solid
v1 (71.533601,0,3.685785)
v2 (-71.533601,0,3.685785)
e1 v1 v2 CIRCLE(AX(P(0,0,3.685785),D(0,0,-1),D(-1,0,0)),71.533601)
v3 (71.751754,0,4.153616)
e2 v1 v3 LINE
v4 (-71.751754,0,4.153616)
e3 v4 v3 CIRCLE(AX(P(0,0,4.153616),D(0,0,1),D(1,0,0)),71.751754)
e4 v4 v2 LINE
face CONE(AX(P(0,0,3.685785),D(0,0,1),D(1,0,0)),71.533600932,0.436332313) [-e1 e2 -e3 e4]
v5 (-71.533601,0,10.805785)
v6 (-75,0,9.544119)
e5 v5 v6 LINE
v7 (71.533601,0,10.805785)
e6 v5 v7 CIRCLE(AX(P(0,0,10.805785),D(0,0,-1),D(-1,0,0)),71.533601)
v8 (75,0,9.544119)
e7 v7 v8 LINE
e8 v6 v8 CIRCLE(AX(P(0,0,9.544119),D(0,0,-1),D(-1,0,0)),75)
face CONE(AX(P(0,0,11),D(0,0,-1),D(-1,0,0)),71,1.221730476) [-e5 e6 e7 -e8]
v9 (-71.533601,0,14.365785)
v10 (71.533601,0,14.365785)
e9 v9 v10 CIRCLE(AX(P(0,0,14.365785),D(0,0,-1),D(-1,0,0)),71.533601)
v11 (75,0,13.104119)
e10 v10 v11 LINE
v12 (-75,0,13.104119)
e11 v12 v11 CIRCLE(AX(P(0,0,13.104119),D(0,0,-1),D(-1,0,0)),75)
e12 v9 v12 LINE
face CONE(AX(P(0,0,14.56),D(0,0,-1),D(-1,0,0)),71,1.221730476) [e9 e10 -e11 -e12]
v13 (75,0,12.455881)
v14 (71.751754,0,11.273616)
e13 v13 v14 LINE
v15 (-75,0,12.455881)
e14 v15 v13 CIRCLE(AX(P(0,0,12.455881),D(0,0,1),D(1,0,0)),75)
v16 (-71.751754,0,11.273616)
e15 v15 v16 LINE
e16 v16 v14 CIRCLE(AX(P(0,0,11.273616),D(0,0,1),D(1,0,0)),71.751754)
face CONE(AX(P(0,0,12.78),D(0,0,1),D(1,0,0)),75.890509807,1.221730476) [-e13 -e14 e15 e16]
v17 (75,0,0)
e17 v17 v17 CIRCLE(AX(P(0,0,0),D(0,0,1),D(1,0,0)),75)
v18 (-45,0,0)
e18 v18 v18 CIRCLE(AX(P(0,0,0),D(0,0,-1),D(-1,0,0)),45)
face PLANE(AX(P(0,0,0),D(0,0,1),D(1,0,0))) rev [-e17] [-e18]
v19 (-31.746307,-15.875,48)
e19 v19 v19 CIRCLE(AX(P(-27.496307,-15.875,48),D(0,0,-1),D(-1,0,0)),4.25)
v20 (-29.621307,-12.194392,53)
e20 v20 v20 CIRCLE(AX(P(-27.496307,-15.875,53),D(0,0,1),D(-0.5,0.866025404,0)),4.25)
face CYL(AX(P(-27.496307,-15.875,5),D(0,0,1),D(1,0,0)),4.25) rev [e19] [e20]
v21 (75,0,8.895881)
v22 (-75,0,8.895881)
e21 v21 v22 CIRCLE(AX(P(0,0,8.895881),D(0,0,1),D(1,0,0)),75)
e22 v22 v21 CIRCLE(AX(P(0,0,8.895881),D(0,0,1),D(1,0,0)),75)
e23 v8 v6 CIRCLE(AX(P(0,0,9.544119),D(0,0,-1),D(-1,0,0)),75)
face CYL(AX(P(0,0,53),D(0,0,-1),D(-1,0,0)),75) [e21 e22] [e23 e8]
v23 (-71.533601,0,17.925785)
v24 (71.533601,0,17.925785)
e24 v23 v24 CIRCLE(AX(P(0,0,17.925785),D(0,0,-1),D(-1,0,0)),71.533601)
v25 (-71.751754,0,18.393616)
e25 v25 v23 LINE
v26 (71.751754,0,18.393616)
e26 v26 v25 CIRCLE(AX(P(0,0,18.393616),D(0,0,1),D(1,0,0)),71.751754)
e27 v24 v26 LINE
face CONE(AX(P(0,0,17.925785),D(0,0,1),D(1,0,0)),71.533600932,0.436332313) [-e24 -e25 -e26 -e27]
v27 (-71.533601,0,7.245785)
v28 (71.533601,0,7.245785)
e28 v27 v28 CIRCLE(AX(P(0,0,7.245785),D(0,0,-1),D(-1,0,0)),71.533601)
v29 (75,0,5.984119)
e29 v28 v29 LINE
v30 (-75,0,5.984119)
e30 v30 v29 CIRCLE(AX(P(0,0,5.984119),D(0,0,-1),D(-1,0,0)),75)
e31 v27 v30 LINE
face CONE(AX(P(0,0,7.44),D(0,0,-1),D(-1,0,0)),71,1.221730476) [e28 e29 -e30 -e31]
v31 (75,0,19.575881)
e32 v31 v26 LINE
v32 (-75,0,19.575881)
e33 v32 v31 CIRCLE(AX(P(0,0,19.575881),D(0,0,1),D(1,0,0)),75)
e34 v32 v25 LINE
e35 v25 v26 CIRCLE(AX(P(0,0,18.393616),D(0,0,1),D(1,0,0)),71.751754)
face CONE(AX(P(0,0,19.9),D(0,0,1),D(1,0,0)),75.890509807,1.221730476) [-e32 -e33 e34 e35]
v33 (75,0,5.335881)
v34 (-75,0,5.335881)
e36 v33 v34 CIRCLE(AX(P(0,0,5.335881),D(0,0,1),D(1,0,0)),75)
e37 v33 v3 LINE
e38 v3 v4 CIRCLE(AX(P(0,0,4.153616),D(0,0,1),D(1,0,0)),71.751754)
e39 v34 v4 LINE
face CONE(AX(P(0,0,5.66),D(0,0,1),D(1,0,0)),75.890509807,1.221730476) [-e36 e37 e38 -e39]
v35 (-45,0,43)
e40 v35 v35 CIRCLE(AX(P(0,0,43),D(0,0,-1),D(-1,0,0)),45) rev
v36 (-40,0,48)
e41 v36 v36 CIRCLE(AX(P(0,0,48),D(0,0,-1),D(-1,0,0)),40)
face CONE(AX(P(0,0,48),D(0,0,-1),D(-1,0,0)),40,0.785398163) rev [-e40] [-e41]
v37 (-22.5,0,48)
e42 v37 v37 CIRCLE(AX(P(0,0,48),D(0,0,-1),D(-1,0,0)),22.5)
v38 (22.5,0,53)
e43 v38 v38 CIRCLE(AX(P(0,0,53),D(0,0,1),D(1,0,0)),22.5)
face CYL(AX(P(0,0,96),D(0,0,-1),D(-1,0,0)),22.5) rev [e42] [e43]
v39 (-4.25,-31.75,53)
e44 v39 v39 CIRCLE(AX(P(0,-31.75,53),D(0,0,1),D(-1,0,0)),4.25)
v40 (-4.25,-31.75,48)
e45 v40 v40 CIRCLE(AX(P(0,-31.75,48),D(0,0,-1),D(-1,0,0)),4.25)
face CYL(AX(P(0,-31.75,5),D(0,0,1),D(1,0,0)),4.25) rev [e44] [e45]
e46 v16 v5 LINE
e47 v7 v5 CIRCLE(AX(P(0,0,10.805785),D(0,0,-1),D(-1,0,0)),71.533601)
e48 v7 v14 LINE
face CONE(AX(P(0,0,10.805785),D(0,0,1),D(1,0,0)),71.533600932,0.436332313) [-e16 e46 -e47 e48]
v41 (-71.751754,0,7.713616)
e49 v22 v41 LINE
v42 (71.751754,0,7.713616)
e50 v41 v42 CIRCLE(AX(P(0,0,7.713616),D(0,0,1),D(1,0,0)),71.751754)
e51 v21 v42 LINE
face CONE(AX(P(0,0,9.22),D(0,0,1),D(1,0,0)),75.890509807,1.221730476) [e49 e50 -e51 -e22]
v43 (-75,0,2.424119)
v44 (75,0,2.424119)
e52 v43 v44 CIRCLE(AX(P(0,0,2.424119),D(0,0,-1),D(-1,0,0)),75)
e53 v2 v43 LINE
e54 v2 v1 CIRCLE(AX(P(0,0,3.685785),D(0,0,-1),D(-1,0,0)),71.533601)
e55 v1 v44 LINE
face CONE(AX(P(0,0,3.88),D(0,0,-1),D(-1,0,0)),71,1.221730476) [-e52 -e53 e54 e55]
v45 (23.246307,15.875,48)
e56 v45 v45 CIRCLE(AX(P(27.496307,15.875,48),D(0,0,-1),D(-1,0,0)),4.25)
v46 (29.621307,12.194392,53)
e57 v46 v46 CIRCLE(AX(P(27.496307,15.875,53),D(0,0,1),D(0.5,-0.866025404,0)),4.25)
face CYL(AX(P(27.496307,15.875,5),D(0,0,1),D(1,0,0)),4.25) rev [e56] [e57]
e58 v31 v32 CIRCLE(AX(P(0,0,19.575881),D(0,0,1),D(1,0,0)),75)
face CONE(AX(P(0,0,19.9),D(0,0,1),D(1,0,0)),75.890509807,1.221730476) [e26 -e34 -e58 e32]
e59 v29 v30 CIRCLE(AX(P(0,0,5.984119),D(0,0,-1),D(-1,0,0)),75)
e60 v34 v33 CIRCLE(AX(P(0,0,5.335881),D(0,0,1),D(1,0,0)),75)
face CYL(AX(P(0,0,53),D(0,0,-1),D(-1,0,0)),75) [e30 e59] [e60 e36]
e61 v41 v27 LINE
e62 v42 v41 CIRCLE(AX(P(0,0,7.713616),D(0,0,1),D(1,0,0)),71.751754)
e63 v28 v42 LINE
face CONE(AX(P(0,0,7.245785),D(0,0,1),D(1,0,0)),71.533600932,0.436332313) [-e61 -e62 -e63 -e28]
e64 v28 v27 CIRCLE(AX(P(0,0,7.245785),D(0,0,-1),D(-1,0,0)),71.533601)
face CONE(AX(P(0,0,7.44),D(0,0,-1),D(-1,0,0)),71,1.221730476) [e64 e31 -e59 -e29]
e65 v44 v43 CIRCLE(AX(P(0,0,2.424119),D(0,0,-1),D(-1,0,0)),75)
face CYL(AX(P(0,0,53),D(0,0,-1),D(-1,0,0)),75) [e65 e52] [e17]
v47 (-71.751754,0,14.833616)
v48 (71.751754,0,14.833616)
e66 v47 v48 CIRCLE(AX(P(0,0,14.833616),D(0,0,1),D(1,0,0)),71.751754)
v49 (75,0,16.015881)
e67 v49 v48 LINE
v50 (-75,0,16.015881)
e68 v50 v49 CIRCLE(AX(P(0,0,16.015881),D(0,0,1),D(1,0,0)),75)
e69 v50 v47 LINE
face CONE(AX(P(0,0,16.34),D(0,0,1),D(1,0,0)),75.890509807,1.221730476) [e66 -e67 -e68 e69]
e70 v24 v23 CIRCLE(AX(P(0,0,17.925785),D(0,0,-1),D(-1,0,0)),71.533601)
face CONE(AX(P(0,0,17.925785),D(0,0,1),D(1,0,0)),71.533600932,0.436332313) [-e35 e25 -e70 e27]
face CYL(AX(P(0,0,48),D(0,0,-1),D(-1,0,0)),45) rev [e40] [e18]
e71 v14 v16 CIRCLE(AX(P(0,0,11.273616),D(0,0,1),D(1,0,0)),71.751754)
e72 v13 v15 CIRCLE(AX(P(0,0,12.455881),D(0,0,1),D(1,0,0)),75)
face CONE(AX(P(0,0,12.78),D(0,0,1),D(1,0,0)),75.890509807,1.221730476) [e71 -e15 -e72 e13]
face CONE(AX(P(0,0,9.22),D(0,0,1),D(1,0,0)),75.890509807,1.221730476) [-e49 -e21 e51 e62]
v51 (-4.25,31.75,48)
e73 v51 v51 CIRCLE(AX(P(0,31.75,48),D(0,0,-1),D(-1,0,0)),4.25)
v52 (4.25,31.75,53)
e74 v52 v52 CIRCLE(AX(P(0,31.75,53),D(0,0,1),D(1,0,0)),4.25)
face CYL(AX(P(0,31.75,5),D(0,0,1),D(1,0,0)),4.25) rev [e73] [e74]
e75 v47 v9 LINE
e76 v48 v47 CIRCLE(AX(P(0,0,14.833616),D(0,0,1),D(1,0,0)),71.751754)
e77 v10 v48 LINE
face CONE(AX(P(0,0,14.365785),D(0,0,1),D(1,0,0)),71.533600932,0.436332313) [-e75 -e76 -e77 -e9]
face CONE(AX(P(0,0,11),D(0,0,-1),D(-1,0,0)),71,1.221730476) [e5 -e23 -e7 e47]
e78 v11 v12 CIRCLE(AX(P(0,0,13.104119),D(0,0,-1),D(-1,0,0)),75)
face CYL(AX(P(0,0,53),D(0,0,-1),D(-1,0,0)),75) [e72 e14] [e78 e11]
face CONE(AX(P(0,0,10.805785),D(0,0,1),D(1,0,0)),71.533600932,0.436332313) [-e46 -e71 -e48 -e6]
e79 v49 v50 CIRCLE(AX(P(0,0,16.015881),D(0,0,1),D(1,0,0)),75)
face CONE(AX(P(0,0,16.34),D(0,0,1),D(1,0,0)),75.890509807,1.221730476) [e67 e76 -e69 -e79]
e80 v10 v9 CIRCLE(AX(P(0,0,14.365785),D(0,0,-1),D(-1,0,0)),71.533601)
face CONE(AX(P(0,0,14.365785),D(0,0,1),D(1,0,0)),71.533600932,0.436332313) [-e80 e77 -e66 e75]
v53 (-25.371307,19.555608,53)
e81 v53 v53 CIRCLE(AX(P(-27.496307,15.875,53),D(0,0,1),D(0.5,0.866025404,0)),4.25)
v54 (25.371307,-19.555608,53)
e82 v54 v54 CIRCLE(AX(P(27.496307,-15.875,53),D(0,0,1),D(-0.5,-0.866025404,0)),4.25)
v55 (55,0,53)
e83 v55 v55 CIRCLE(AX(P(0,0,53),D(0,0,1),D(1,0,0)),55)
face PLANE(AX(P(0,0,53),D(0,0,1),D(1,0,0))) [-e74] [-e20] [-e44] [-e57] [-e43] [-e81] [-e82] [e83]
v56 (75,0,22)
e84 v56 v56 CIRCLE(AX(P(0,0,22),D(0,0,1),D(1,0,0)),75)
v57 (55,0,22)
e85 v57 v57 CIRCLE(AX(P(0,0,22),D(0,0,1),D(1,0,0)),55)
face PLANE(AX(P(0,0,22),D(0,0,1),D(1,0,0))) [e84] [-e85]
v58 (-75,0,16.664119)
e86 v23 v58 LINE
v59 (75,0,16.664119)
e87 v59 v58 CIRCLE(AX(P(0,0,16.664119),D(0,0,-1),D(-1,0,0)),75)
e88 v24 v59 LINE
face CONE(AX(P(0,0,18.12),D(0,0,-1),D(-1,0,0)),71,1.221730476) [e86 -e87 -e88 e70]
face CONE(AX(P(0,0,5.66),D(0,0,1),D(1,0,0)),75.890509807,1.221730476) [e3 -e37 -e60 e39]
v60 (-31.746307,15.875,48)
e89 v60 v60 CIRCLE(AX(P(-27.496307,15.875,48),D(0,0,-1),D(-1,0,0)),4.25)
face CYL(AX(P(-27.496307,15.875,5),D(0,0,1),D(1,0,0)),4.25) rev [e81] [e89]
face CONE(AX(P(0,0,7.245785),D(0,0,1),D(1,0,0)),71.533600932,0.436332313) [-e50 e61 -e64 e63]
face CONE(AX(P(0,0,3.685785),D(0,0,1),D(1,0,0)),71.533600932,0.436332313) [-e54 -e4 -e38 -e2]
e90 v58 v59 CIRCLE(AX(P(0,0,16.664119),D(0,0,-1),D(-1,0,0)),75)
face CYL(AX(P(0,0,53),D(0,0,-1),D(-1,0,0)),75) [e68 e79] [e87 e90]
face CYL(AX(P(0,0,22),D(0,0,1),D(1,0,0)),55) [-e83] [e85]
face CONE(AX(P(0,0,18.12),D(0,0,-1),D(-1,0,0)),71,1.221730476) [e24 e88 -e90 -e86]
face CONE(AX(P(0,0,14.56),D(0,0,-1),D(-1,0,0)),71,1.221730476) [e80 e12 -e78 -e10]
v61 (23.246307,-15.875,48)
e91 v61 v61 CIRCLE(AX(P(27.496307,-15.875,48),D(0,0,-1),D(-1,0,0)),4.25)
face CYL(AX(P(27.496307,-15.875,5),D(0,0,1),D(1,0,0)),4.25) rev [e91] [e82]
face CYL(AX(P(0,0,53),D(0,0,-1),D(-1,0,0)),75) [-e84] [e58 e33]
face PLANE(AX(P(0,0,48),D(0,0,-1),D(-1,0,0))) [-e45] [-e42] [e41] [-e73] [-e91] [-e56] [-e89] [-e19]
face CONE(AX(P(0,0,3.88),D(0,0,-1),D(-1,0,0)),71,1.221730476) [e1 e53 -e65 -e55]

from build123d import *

# Parameters (mm, degrees)
ESQUISSE1_R                  = 75
BOSS_EXTRU_1_DEPTH           = 53
ENL_V_START                  = -31
ESQUISSE2_R                  = 75
ESQUISSE2_R_2                = 55
ENL_V_MAT_EXTRU_1_DEPTH      = 31
ESQUISSE3_R                  = 45
ENL_V_MAT_EXTRU_2_DEPTH      = 48
ESQUISSE4_R                  = 22.5
ENL_V_MAT_EXTRU_3_DEPTH      = 48
ESQUISSE5_R                  = 4.25
ENL_V_MAT_EXTRU_4_DEPTH      = 48
R_P_TITION_CIRCULAIRE1_COUNT = 6
R_P_TITION_LIN_AIRE1_COUNT   = 3
R_P_TITION_LIN_AIRE1_PITCH   = 3.56
R_P_TITION_LIN_AIRE2_COUNT   = 3
R_P_TITION_LIN_AIRE2_PITCH   = 3.56
CHANFREIN1_SIZE              = 0.567846251
CHANFREIN1_SIZE_2            = 0.8
CHANFREIN2_SIZE              = 5


with BuildPart() as part:
    # Esquisse1 → Boss.-Extru.1 (new body)
    with BuildSketch(Plane.XY):
        Circle(ESQUISSE1_R)
    extrude(amount=BOSS_EXTRU_1_DEPTH)

    # Esquisse2 → Enlèv. mat.-Extru.1 (cut)
    with BuildSketch(Plane.XY.offset(53).offset(ENL_V_START)):
        Circle(ESQUISSE2_R)
        Circle(ESQUISSE2_R_2, mode=Mode.SUBTRACT)
    extrude(amount=ENL_V_MAT_EXTRU_1_DEPTH, mode=Mode.SUBTRACT)

    # Esquisse3 → Enlèv. mat.-Extru.2 (cut)
    with BuildSketch(Plane(origin=(0, 0, 0), x_dir=(-1, 0, 0), z_dir=(0, 0, -1))):
        Circle(ESQUISSE3_R)
    extrude(amount=-ENL_V_MAT_EXTRU_2_DEPTH, mode=Mode.SUBTRACT)

    # Esquisse4 → Enlèv. mat.-Extru.3 (cut)
    with BuildSketch(Plane(origin=(0, 0, 48), x_dir=(-1, 0, 0), z_dir=(0, 0, -1))):
        Circle(ESQUISSE4_R)
    extrude(amount=-ENL_V_MAT_EXTRU_3_DEPTH, mode=Mode.SUBTRACT)

    # Esquisse5 → Enlèv. mat.-Extru.4 (cut)
    with BuildSketch(Plane.XY.offset(53)):
        with Locations((0, 31.75)):
            Circle(ESQUISSE5_R)
    enl_v_mat_extru_4 = extrude(amount=-ENL_V_MAT_EXTRU_4_DEPTH, mode=Mode.SUBTRACT)

    # Répétition circulaire1: Enlèv. mat.-Extru.4 ×6 about axis
    r_p_tition_circulaire1_axis = Axis((0, 0, 0), (0, 0, 1))
    for i in range(1, R_P_TITION_CIRCULAIRE1_COUNT):
        add(enl_v_mat_extru_4.rotate(r_p_tition_circulaire1_axis, i * 360 / R_P_TITION_CIRCULAIRE1_COUNT), mode=Mode.SUBTRACT)

    # Enlèvement de matière-Balayage1: sweep along a curve in space
    with BuildLine() as enl_vement_de_mati_re_balayage1_path:
        ThreePointArc((75, 0, 0), (53.033008589, 53.033008589, 0), (0, 75, 0))
        ThreePointArc((0, 75, 0), (-53.033008589, 53.033008589, 0), (-75, 0, 0))
        ThreePointArc((-75, 0, 0), (-53.033008589, -53.033008589, 0), (0, -75, 0))
        ThreePointArc((0, -75, 0), (53.033008589, -53.033008589, 0), (75, 0, 0))
    # Esquisse6 → Enlèvement de matière-Balayage1 (sweep, cut)
    with BuildSketch(Plane(origin=(0, 0, 0), x_dir=(1, 0, 0), z_dir=(0, 1, 0))):
        Polygon((-75.890509807, -12.78), (-71, -11), (-75.890509807, -9.22), align=None)
    enl_vement_de_mati_re_balayage1 = sweep(path=enl_vement_de_mati_re_balayage1_path.line, mode=Mode.SUBTRACT)

    # Répétition linéaire1: Enlèvement de matière-Balayage1 ×3
    with Locations(*[(0, 0, -i * R_P_TITION_LIN_AIRE1_PITCH) for i in range(1, R_P_TITION_LIN_AIRE1_COUNT)]):
        add(enl_vement_de_mati_re_balayage1, mode=Mode.SUBTRACT)

    # Répétition linéaire2: Enlèvement de matière-Balayage1 ×3
    with Locations(*[(0, 0, i * R_P_TITION_LIN_AIRE2_PITCH) for i in range(1, R_P_TITION_LIN_AIRE2_COUNT)]):
        add(enl_vement_de_mati_re_balayage1, mode=Mode.SUBTRACT)

    # Chanfrein1
    # the kernel refuses this chamfer: 0.8, 0.567846251 mm, written as the material it adds along each edge
    with BuildSketch(Plane(origin=(0, 0, 14.56), x_dir=(0, -1, 0), z_dir=(-1, 0, 0))) as chanfrein1_piece_1:
        Polygon((71 + CHANFREIN1_SIZE * 0.939692621403, -CHANFREIN1_SIZE * 0.34202014355), (71 + CHANFREIN1_SIZE_2 * 0.939692620786, CHANFREIN1_SIZE_2 * 0.342020143326), (71, 0), align=None)
    revolve(axis=Axis((0, 0, 14.56), (0, 0, 1)), revolution_arc=90)
    with BuildSketch(Plane(origin=(0, 0, 14.56), x_dir=(0, 1, 0), z_dir=(1, 0, 0))) as chanfrein1_piece_2:
        Polygon((71 + CHANFREIN1_SIZE * 0.939692621403, -CHANFREIN1_SIZE * 0.34202014355), (71 + CHANFREIN1_SIZE_2 * 0.939692620786, CHANFREIN1_SIZE_2 * 0.342020143326), (71, 0), align=None)
    revolve(axis=Axis((0, 0, 14.56), (0, 0, 1)), revolution_arc=90)
    with BuildSketch(Plane(origin=(0, 0, 18.12), x_dir=(-1, 0, 0), z_dir=(0, 1, 0))) as chanfrein1_piece_3:
        Polygon((71 + CHANFREIN1_SIZE_2 * 0.939692620786, CHANFREIN1_SIZE_2 * 0.342020143326), (71 + CHANFREIN1_SIZE * 0.939692621403, -CHANFREIN1_SIZE * 0.34202014355), (71, 0), align=None)
    revolve(axis=Axis((0, 0, 18.12), (0, 0, 1)), revolution_arc=90)
    with BuildSketch(Plane(origin=(0, 0, 18.12), x_dir=(0, 1, 0), z_dir=(1, 0, 0))) as chanfrein1_piece_4:
        Polygon((71 + CHANFREIN1_SIZE_2 * 0.939692620786, CHANFREIN1_SIZE_2 * 0.342020143326), (71 + CHANFREIN1_SIZE * 0.939692621403, -CHANFREIN1_SIZE * 0.34202014355), (71, 0), align=None)
    revolve(axis=Axis((0, 0, 18.12), (0, 0, 1)), revolution_arc=90)
    with BuildSketch(Plane(origin=(0, 0, 11), x_dir=(0, -1, 0), z_dir=(-1, 0, 0))) as chanfrein1_piece_5:
        Polygon((71 + CHANFREIN1_SIZE * 0.939692621403, -CHANFREIN1_SIZE * 0.34202014355), (71 + CHANFREIN1_SIZE_2 * 0.939692620786, CHANFREIN1_SIZE_2 * 0.342020143326), (71, 0), align=None)
    revolve(axis=Axis((0, 0, 11), (0, 0, 1)), revolution_arc=90)
    with BuildSketch(Plane(origin=(0, 0, 11), x_dir=(0, 1, 0), z_dir=(1, 0, 0))) as chanfrein1_piece_6:
        Polygon((71 + CHANFREIN1_SIZE * 0.939692621403, -CHANFREIN1_SIZE * 0.34202014355), (71 + CHANFREIN1_SIZE_2 * 0.939692620786, CHANFREIN1_SIZE_2 * 0.342020143326), (71, 0), align=None)
    revolve(axis=Axis((0, 0, 11), (0, 0, 1)), revolution_arc=90)
    with BuildSketch(Plane(origin=(0, 0, 7.44), x_dir=(0, -1, 0), z_dir=(-1, 0, 0))) as chanfrein1_piece_7:
        Polygon((71 + CHANFREIN1_SIZE * 0.939692621403, -CHANFREIN1_SIZE * 0.34202014355), (71 + CHANFREIN1_SIZE_2 * 0.939692620786, CHANFREIN1_SIZE_2 * 0.342020143326), (71, 0), align=None)
    revolve(axis=Axis((0, 0, 7.44), (0, 0, 1)), revolution_arc=90)
    with BuildSketch(Plane(origin=(0, 0, 7.44), x_dir=(0, 1, 0), z_dir=(1, 0, 0))) as chanfrein1_piece_8:
        Polygon((71 + CHANFREIN1_SIZE * 0.939692621403, -CHANFREIN1_SIZE * 0.34202014355), (71 + CHANFREIN1_SIZE_2 * 0.939692620786, CHANFREIN1_SIZE_2 * 0.342020143326), (71, 0), align=None)
    revolve(axis=Axis((0, 0, 7.44), (0, 0, 1)), revolution_arc=90)
    with BuildSketch(Plane(origin=(0, 0, 3.88), x_dir=(0, -1, 0), z_dir=(-1, 0, 0))) as chanfrein1_piece_9:
        Polygon((71 + CHANFREIN1_SIZE * 0.939692621403, -CHANFREIN1_SIZE * 0.34202014355), (71 + CHANFREIN1_SIZE_2 * 0.939692620786, CHANFREIN1_SIZE_2 * 0.342020143326), (71, 0), align=None)
    revolve(axis=Axis((0, 0, 3.88), (0, 0, 1)), revolution_arc=90)
    with BuildSketch(Plane(origin=(0, 0, 3.88), x_dir=(0, 1, 0), z_dir=(1, 0, 0))) as chanfrein1_piece_10:
        Polygon((71 + CHANFREIN1_SIZE * 0.939692621403, -CHANFREIN1_SIZE * 0.34202014355), (71 + CHANFREIN1_SIZE_2 * 0.939692620786, CHANFREIN1_SIZE_2 * 0.342020143326), (71, 0), align=None)
    revolve(axis=Axis((0, 0, 3.88), (0, 0, 1)), revolution_arc=90)
    with BuildSketch(Plane(origin=(0, 0, 3.88), x_dir=(1, 0, 0), z_dir=(0, -1, 0))) as chanfrein1_piece_11:
        Polygon((71 + CHANFREIN1_SIZE * 0.939692621403, -CHANFREIN1_SIZE * 0.34202014355), (71 + CHANFREIN1_SIZE_2 * 0.939692620786, CHANFREIN1_SIZE_2 * 0.342020143326), (71, 0), align=None)
    revolve(axis=Axis((0, 0, 3.88), (0, 0, 1)), revolution_arc=90)
    with BuildSketch(Plane(origin=(0, 0, 3.88), x_dir=(-1, 0, 0), z_dir=(0, 1, 0))) as chanfrein1_piece_12:
        Polygon((71 + CHANFREIN1_SIZE * 0.939692621403, -CHANFREIN1_SIZE * 0.34202014355), (71 + CHANFREIN1_SIZE_2 * 0.939692620786, CHANFREIN1_SIZE_2 * 0.342020143326), (71, 0), align=None)
    revolve(axis=Axis((0, 0, 3.88), (0, 0, 1)), revolution_arc=90)
    with BuildSketch(Plane(origin=(0, 0, 7.44), x_dir=(1, 0, 0), z_dir=(0, -1, 0))) as chanfrein1_piece_13:
        Polygon((71 + CHANFREIN1_SIZE * 0.939692621403, -CHANFREIN1_SIZE * 0.34202014355), (71 + CHANFREIN1_SIZE_2 * 0.939692620786, CHANFREIN1_SIZE_2 * 0.342020143326), (71, 0), align=None)
    revolve(axis=Axis((0, 0, 7.44), (0, 0, 1)), revolution_arc=90)
    with BuildSketch(Plane(origin=(0, 0, 7.44), x_dir=(-1, 0, 0), z_dir=(0, 1, 0))) as chanfrein1_piece_14:
        Polygon((71 + CHANFREIN1_SIZE * 0.939692621403, -CHANFREIN1_SIZE * 0.34202014355), (71 + CHANFREIN1_SIZE_2 * 0.939692620786, CHANFREIN1_SIZE_2 * 0.342020143326), (71, 0), align=None)
    revolve(axis=Axis((0, 0, 7.44), (0, 0, 1)), revolution_arc=90)
    with BuildSketch(Plane(origin=(0, 0, 11), x_dir=(1, 0, 0), z_dir=(0, -1, 0))) as chanfrein1_piece_15:
        Polygon((71 + CHANFREIN1_SIZE * 0.939692621403, -CHANFREIN1_SIZE * 0.34202014355), (71 + CHANFREIN1_SIZE_2 * 0.939692620786, CHANFREIN1_SIZE_2 * 0.342020143326), (71, 0), align=None)
    revolve(axis=Axis((0, 0, 11), (0, 0, 1)), revolution_arc=90)
    with BuildSketch(Plane(origin=(0, 0, 11), x_dir=(-1, 0, 0), z_dir=(0, 1, 0))) as chanfrein1_piece_16:
        Polygon((71 + CHANFREIN1_SIZE * 0.939692621403, -CHANFREIN1_SIZE * 0.34202014355), (71 + CHANFREIN1_SIZE_2 * 0.939692620786, CHANFREIN1_SIZE_2 * 0.342020143326), (71, 0), align=None)
    revolve(axis=Axis((0, 0, 11), (0, 0, 1)), revolution_arc=90)
    with BuildSketch(Plane(origin=(0, 0, 18.12), x_dir=(1, 0, 0), z_dir=(0, -1, 0))) as chanfrein1_piece_17:
        Polygon((71 + CHANFREIN1_SIZE_2 * 0.939692620786, CHANFREIN1_SIZE_2 * 0.342020143326), (71 + CHANFREIN1_SIZE * 0.939692621403, -CHANFREIN1_SIZE * 0.34202014355), (71, 0), align=None)
    revolve(axis=Axis((0, 0, 18.12), (0, 0, 1)), revolution_arc=90)
    with BuildSketch(Plane(origin=(0, 0, 18.12), x_dir=(0, -1, 0), z_dir=(-1, 0, 0))) as chanfrein1_piece_18:
        Polygon((71 + CHANFREIN1_SIZE_2 * 0.939692620786, CHANFREIN1_SIZE_2 * 0.342020143326), (71 + CHANFREIN1_SIZE * 0.939692621403, -CHANFREIN1_SIZE * 0.34202014355), (71, 0), align=None)
    revolve(axis=Axis((0, 0, 18.12), (0, 0, 1)), revolution_arc=90)
    with BuildSketch(Plane(origin=(0, 0, 14.56), x_dir=(1, 0, 0), z_dir=(0, -1, 0))) as chanfrein1_piece_19:
        Polygon((71 + CHANFREIN1_SIZE * 0.939692621403, -CHANFREIN1_SIZE * 0.34202014355), (71 + CHANFREIN1_SIZE_2 * 0.939692620786, CHANFREIN1_SIZE_2 * 0.342020143326), (71, 0), align=None)
    revolve(axis=Axis((0, 0, 14.56), (0, 0, 1)), revolution_arc=90)
    with BuildSketch(Plane(origin=(0, 0, 14.56), x_dir=(-1, 0, 0), z_dir=(0, 1, 0))) as chanfrein1_piece_20:
        Polygon((71 + CHANFREIN1_SIZE * 0.939692621403, -CHANFREIN1_SIZE * 0.34202014355), (71 + CHANFREIN1_SIZE_2 * 0.939692620786, CHANFREIN1_SIZE_2 * 0.342020143326), (71, 0), align=None)
    revolve(axis=Axis((0, 0, 14.56), (0, 0, 1)), revolution_arc=90)

    # Chanfrein2
    chanfrein2_edges = [part.edges().sort_by_distance(p)[0] for p in [
        (45, 0, 48),
    ]]
    chamfer(chanfrein2_edges, length=CHANFREIN2_SIZE)


solid = part.part
